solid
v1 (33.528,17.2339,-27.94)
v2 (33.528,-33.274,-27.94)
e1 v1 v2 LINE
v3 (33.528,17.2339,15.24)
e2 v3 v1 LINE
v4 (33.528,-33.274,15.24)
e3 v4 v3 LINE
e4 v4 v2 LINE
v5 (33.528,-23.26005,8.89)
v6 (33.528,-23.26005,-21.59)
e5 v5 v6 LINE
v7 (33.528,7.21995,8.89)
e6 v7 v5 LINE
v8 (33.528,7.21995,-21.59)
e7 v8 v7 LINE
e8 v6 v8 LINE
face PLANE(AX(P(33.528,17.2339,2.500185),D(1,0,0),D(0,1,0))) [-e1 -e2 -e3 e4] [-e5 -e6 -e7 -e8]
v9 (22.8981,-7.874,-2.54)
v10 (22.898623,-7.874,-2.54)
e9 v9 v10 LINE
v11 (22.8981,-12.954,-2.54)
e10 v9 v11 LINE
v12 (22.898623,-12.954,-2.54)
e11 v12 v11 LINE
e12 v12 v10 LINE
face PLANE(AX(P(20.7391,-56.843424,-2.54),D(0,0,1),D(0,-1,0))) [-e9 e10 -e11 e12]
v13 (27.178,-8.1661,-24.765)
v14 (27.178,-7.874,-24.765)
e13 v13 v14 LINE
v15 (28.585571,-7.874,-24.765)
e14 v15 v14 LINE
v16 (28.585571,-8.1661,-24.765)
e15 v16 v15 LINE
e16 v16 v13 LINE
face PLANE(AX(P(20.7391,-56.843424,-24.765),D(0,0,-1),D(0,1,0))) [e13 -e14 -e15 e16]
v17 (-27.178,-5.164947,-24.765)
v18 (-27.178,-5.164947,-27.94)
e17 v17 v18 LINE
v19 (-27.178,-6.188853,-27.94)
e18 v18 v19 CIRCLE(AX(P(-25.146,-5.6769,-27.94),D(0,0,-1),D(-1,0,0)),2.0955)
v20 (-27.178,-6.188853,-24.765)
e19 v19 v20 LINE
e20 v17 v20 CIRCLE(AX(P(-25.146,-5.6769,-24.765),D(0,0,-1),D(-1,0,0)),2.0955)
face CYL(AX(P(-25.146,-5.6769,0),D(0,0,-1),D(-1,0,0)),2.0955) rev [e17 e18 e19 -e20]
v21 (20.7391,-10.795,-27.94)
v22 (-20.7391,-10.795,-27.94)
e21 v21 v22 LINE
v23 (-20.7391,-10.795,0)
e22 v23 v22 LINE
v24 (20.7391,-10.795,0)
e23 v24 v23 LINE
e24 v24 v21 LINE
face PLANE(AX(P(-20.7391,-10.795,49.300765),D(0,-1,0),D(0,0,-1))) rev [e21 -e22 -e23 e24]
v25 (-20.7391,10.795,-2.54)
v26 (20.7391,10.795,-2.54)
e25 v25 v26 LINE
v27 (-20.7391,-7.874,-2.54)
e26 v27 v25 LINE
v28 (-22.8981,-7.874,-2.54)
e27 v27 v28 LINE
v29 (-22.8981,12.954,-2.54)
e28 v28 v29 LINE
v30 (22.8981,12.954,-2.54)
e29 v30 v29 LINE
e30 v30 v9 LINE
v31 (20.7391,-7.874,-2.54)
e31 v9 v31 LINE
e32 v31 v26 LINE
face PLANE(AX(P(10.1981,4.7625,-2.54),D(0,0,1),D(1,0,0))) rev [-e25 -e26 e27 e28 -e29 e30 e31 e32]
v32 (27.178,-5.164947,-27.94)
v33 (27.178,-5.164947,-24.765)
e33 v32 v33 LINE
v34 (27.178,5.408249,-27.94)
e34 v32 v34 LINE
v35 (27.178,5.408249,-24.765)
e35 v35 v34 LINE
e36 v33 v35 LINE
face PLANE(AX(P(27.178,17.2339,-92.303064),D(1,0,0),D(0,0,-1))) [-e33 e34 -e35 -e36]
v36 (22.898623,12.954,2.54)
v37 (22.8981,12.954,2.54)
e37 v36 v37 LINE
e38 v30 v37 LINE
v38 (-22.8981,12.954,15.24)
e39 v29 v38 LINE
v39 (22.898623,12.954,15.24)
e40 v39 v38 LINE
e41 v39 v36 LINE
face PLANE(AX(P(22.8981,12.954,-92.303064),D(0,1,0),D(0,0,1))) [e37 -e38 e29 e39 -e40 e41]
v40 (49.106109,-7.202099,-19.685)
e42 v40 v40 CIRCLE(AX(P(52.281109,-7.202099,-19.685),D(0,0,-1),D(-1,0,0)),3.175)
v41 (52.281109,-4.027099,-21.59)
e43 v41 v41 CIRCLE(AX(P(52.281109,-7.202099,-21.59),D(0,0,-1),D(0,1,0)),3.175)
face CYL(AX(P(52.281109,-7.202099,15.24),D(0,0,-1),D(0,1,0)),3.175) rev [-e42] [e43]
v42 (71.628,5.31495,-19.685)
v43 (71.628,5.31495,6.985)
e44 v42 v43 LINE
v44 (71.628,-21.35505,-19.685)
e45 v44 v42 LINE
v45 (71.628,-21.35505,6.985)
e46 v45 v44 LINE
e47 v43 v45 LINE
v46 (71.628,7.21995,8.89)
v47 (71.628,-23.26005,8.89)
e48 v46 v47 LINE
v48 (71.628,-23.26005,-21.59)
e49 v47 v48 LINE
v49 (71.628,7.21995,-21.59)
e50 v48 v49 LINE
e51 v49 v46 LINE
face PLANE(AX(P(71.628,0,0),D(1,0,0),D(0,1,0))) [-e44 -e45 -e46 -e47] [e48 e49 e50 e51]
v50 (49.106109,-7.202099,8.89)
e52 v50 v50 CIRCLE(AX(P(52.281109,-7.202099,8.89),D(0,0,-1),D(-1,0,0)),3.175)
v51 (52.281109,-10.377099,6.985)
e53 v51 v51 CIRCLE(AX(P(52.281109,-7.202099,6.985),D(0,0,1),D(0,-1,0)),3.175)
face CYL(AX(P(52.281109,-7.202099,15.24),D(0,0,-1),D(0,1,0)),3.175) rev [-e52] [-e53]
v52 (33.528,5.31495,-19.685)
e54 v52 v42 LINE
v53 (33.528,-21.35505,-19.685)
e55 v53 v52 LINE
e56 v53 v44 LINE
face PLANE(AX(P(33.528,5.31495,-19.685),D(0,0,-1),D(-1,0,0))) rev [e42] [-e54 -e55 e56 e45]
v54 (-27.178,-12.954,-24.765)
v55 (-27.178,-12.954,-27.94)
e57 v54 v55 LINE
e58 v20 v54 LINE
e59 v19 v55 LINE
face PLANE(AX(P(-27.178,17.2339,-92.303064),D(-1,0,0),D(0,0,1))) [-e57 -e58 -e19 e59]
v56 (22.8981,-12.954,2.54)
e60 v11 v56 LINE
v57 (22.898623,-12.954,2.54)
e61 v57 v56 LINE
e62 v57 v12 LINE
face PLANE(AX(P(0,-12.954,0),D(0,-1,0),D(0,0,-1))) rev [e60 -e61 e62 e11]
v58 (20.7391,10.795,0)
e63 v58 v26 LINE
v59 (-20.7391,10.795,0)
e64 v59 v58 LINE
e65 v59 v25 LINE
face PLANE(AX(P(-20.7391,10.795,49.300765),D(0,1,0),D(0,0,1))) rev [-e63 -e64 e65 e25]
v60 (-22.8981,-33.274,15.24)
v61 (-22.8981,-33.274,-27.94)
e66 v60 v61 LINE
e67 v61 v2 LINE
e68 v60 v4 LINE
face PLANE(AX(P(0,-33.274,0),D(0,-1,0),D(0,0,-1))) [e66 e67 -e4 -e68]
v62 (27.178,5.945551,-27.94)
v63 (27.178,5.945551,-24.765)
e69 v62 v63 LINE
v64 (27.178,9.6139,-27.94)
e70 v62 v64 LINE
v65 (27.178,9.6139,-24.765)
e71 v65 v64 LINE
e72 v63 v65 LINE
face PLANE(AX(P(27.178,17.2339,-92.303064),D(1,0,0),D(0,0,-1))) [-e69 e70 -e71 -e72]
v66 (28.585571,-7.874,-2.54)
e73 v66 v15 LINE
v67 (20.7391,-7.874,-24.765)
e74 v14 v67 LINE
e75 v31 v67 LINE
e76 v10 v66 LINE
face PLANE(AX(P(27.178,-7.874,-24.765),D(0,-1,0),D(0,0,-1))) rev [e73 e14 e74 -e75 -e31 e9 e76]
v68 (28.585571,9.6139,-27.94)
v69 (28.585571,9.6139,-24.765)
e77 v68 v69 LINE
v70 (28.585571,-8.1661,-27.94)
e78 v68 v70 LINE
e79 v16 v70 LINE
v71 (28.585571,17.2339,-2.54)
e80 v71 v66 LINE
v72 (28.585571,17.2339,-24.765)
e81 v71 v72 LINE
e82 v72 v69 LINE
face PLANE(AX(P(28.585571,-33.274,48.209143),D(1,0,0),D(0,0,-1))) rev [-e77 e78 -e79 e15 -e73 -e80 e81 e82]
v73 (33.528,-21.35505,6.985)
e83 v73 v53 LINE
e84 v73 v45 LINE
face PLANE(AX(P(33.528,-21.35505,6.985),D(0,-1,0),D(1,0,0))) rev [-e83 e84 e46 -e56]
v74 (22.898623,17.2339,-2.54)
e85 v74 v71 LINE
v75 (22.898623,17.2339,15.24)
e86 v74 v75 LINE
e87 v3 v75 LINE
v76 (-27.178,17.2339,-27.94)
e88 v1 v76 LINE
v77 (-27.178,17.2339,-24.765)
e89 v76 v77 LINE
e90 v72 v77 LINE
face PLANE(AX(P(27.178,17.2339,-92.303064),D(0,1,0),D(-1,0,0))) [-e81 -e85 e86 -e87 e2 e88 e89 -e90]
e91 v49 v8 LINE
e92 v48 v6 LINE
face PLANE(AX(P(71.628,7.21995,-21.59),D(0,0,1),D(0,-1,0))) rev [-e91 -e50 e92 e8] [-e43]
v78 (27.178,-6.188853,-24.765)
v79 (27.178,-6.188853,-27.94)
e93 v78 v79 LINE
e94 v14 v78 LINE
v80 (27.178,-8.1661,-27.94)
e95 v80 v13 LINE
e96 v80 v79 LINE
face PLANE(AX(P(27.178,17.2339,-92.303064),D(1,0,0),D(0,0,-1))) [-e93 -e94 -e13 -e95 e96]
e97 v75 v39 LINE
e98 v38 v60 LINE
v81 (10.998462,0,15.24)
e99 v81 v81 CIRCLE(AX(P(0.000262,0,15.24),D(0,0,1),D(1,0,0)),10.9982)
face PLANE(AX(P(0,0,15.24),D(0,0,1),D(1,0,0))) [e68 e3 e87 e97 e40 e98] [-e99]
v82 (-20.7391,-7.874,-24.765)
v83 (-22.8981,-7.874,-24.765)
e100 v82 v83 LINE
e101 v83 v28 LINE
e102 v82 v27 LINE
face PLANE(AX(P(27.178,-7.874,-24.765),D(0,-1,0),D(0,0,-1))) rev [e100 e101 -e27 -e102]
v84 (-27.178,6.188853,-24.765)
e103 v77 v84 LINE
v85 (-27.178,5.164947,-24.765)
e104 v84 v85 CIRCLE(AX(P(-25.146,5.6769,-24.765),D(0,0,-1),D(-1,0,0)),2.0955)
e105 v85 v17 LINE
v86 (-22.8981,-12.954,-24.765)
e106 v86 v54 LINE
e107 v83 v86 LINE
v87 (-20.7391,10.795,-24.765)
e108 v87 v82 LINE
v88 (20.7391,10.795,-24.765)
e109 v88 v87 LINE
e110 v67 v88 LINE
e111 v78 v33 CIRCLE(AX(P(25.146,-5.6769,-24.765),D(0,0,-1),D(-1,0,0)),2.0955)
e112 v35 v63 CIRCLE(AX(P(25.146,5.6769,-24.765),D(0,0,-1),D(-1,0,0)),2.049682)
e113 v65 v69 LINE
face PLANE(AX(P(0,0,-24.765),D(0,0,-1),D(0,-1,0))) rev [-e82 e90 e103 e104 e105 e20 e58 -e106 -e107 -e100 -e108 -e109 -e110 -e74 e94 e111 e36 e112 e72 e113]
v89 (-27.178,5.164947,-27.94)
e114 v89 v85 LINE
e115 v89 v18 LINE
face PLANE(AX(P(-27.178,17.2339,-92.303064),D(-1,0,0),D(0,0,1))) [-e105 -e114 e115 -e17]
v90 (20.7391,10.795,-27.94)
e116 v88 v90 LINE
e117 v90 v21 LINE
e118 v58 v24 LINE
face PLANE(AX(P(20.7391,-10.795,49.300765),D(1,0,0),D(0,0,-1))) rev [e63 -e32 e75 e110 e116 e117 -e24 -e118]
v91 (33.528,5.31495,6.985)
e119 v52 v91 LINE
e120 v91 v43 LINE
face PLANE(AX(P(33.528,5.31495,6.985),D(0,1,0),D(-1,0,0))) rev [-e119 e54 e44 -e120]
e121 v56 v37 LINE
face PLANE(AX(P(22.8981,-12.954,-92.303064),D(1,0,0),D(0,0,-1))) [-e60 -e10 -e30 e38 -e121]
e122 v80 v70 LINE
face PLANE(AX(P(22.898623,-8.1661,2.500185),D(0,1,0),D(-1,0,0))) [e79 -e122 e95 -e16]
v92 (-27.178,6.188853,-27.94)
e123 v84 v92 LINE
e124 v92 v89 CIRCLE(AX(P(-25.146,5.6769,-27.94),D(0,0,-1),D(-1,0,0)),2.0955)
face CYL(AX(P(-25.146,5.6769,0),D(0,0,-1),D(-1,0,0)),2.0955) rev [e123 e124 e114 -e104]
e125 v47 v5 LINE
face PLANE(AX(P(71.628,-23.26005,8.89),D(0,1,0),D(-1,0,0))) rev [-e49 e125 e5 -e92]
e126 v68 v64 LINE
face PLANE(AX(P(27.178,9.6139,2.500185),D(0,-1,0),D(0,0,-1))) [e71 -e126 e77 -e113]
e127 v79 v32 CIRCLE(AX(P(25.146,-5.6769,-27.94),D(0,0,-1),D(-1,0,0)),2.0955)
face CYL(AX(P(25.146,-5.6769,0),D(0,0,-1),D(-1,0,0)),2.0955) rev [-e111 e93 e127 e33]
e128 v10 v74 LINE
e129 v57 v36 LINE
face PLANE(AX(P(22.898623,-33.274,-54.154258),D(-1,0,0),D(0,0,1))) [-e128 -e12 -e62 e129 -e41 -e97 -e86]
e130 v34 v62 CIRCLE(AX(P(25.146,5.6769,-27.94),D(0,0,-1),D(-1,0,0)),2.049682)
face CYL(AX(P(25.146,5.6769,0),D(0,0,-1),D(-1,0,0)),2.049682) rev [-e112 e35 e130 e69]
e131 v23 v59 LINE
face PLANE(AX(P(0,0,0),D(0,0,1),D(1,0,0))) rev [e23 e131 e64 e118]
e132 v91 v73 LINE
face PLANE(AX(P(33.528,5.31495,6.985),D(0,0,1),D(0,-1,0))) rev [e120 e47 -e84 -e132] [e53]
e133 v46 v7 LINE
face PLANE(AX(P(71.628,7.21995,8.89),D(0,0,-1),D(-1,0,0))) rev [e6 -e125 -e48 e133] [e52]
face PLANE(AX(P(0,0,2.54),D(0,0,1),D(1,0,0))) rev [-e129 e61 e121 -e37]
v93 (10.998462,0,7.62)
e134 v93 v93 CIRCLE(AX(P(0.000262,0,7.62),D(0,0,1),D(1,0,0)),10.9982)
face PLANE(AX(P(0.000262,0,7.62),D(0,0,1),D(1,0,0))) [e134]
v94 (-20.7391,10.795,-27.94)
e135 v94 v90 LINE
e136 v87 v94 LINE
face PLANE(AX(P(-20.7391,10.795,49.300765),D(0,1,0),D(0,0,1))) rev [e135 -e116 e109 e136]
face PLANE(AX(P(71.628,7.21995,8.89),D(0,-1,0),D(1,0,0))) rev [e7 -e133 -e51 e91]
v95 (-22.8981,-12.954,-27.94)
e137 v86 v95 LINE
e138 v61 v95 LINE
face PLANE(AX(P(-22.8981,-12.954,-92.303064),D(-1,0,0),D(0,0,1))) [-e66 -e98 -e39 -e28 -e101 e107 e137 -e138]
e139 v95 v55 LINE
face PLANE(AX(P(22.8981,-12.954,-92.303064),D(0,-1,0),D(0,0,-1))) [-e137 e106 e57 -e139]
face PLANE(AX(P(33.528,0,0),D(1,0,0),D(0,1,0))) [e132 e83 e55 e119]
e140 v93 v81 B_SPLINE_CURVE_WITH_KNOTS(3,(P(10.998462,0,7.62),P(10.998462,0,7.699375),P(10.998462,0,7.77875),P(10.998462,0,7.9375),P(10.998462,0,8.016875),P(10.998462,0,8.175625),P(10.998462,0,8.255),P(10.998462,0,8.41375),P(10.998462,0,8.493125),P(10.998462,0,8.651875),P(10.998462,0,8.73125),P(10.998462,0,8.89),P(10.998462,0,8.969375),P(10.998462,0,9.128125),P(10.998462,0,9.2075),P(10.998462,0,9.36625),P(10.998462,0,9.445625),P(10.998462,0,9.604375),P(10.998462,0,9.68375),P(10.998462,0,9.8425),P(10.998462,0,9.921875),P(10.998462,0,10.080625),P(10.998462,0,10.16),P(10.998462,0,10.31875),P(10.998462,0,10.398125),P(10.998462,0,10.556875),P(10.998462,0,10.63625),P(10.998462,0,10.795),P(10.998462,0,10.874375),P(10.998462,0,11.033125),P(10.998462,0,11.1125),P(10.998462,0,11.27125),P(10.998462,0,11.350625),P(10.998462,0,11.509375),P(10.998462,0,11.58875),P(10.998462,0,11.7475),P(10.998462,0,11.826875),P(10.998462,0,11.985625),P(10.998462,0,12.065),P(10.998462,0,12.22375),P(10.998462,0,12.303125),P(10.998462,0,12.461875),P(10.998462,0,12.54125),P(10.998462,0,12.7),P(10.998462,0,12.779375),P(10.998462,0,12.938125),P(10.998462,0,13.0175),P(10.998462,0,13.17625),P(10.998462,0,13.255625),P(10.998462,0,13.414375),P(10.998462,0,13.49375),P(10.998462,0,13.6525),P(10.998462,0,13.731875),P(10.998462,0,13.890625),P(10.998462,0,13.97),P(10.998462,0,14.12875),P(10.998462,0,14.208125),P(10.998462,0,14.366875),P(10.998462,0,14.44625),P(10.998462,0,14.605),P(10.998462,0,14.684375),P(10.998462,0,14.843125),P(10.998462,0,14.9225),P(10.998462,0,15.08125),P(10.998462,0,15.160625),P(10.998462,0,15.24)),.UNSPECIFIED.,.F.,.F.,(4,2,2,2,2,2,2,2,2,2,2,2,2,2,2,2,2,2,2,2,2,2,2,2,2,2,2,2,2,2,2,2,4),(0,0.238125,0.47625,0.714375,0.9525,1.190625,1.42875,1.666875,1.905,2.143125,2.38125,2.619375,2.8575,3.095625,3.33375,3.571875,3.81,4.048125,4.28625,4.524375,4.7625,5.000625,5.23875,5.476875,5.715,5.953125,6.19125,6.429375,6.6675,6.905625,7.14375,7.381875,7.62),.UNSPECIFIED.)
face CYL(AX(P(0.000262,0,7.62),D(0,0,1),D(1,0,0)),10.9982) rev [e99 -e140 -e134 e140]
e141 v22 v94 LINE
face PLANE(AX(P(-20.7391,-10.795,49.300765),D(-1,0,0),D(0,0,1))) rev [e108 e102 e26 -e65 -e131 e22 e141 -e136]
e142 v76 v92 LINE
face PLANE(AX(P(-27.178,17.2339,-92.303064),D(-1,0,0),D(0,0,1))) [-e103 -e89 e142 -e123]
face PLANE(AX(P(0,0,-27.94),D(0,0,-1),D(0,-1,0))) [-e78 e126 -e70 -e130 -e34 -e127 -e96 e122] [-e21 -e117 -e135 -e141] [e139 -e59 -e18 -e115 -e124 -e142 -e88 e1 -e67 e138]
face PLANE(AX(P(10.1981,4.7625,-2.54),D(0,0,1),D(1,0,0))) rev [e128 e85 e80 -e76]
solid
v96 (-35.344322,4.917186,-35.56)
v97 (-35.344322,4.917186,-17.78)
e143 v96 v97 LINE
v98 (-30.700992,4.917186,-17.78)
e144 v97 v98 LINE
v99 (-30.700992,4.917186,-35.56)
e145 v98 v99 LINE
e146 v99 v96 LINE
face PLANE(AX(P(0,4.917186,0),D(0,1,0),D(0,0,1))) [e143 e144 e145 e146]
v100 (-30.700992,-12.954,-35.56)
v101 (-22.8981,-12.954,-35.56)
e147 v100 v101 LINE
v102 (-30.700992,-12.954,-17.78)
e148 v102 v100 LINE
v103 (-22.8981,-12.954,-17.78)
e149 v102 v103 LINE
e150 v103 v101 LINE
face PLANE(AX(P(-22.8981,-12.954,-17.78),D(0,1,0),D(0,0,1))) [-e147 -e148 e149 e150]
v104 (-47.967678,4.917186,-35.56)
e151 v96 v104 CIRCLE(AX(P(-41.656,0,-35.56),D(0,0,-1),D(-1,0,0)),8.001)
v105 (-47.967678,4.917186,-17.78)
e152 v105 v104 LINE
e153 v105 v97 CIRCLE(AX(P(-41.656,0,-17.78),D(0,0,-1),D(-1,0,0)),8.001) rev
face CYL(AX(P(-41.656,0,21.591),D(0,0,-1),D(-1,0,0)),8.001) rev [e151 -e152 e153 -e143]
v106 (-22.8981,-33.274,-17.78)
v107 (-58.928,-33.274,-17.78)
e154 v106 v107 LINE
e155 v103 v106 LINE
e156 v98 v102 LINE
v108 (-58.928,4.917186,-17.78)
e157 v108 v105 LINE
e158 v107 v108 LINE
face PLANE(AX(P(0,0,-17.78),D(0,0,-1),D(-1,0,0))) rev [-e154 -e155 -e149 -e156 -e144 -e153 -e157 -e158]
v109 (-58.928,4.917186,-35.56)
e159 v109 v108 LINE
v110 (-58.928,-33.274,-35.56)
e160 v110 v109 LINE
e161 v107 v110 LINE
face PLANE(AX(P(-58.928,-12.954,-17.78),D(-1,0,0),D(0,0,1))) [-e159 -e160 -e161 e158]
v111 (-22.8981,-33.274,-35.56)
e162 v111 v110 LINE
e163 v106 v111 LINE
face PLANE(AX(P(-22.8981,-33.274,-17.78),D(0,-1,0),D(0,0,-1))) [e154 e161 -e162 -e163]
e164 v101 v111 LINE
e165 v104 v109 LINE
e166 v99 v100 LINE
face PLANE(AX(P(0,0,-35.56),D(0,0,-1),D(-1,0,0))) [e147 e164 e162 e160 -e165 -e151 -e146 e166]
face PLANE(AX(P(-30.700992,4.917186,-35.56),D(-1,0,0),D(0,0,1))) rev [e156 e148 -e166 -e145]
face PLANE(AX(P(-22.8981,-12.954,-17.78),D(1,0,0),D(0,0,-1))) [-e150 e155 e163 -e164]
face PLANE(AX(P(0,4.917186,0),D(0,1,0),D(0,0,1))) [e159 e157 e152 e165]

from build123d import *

# Parameters (mm, degrees)
SKETCH1_W                = 54.356
SKETCH1_H                = 34.4678
SKETCH1_W_2              = 40.2082
SKETCH1_H_2              = 20.32
BOSS_EXTRUDE1_DEPTH      = 27.94
SKETCH2_W                = 54.356
SKETCH2_H                = 34.4678
SKETCH2_W_2              = 45.7962
SKETCH2_H_2              = 25.908
CUT_EXTRUDE1_DEPTH       = 24.765
SKETCH3_R                = 2.04968225
SKETCH3_R_2              = 2.0955
CUT_EXTRUDE2_DEPTH       = 43.618007851
SKETCH4_W                = 19.05
SKETCH4_H                = 9.525
CUT_EXTRUDE3_DEPTH       = 12.7
SKETCH5_W                = 45.7962
SKETCH5_H                = 25.908
BOSS_EXTRUDE2_DEPTH      = 2.54
SKETCH6_W                = 25.4
SKETCH6_H                = 4.2799
BOSS_EXTRUDE3_DEPTH      = 27.305
SKETCH7_W                = 25.4
SKETCH7_H                = 6.35
BOSS_EXTRUDE4_DEPTH      = 19.05
SKETCH10_W               = 3.175
SKETCH10_H               = 19.05
BOSS_EXTRUDE5_DEPTH      = 19.05
CHAMFER1_SIZE            = 19.05
SKETCH12_W               = 7.62
SKETCH12_H               = 31.75
BOSS_EXTRUDE6_DEPTH      = 3.175
SKETCH13_W               = 41.4782
SKETCH13_H               = 21.59
CUT_EXTRUDE7_DEPTH       = 27.94
SKETCH14_W               = 22.225
SKETCH14_H               = 20.828
SKETCH14_W_2             = 49.53
SKETCH14_H_2             = 7.4549
CUT_EXTRUDE8_DEPTH       = 61.866925258
SKETCH15_W               = 3.175
SKETCH15_H               = 4.2799
CUT_EXTRUDE9_DEPTH       = 64.49980823
SKETCH16_W               = 45.796723327
SKETCH16_H               = 30.48
BOSS_EXTRUDE7_DEPTH      = 20.32
BOSS_EXTRUDE8_DEPTH      = 7.62
BOSS_EXTRUDE8_DEPTH_BACK = 10.16
SKETCH17_W               = 36.0299
SKETCH17_H               = 20.32
SKETCH18_W               = 28.227007584
SKETCH18_H               = 17.78
BOSS_EXTRUDE9_DEPTH      = 17.871186
SKETCH19_R               = 8.001
CUT_EXTRUDE10_DEPTH      = 17.78
SKETCH20_W               = 19.05
SKETCH20_H               = 21.1201
CUT_EXTRUDE11_DEPTH      = 70.85190382
SKETCH21_W               = 45.796723327
SKETCH21_H               = 46.228
BOSS_EXTRUDE10_DEPTH     = 12.7
SKETCH23_R               = 10.9982
CUT_EXTRUDE12_DEPTH      = 7.62
SKETCH25_W               = 6.35
SKETCH25_H               = 7.62
SKETCH25_W_2             = 10.629376673
SKETCH25_H_2             = 25.1079
BOSS_EXTRUDE12_DEPTH     = 3.175
SKETCH26_W               = 10.629376673
SKETCH26_H               = 50.5079
BOSS_EXTRUDE14_DEPTH     = 17.78
BOSS_EXTRUDE15_START     = -3.175
SKETCH27_W               = 4.942428742
SKETCH27_H               = 50.5079
BOSS_EXTRUDE15_DEPTH     = 25.4
SKETCH28_W               = 7.846471258
SKETCH28_H               = 22.225
BOSS_EXTRUDE16_DEPTH     = 25.4
SKETCH29_W               = 30.48
SKETCH29_H               = 30.48
BOSS_EXTRUDE17_DEPTH     = 38.1
SKETCH30_W               = 26.67
SKETCH30_H               = 26.67
CUT_EXTRUDE13_DEPTH      = 38.1
SKETCH31_R               = 3.175
CUT_EXTRUDE14_DEPTH      = 88.144583079


with BuildPart() as part:
    # Sketch1 → Boss-Extrude1 (new body)
    with BuildSketch(Plane.XY):
        Rectangle(SKETCH1_W, SKETCH1_H)
        Rectangle(SKETCH1_W_2, SKETCH1_H_2, mode=Mode.SUBTRACT)
    extrude(amount=-BOSS_EXTRUDE1_DEPTH)

    # Sketch2 → Cut-Extrude1 (cut)
    with BuildSketch(Plane.XY):
        Rectangle(SKETCH2_W, SKETCH2_H)
        Rectangle(SKETCH2_W_2, SKETCH2_H_2, mode=Mode.SUBTRACT)
    extrude(amount=-CUT_EXTRUDE1_DEPTH, mode=Mode.SUBTRACT)

    # Sketch3 → Cut-Extrude2 (cut, through all)
    with BuildSketch(Plane(origin=(0, 0, -27.94), x_dir=(-1, 0, 0), z_dir=(0, 0, -1))):
        with Locations((-25.146, 5.6769)):
            Circle(SKETCH3_R)
        with Locations((-25.146, -5.6769)):
            Circle(SKETCH3_R_2)
        with Locations((25.146, -5.6769)):
            Circle(SKETCH3_R_2)
        with Locations((25.146, 5.6769)):
            Circle(SKETCH3_R_2)
    extrude(amount=-CUT_EXTRUDE2_DEPTH, mode=Mode.SUBTRACT)

    # Sketch4 → Cut-Extrude3 (cut)
    with BuildSketch(Plane(origin=(22.8981, 0, 0), x_dir=(0, 0, -1), z_dir=(1, 0, 0))):
        with Locations((12.065, 0)):
            Rectangle(SKETCH4_W, SKETCH4_H)
    extrude(amount=-CUT_EXTRUDE3_DEPTH, mode=Mode.SUBTRACT)

    # Sketch5 → Boss-Extrude2 (add)
    with BuildSketch(Plane.XY):
        Rectangle(SKETCH5_W, SKETCH5_H)
    extrude(amount=BOSS_EXTRUDE2_DEPTH)

    # Sketch6 → Boss-Extrude3 (add)
    with BuildSketch(Plane.XY.offset(2.54)):
        with Locations((0, -15.09395)):
            Rectangle(SKETCH6_W, SKETCH6_H)
    extrude(amount=-BOSS_EXTRUDE3_DEPTH)

    # Sketch7 → Boss-Extrude4 (add)
    with BuildSketch(Plane.XY.offset(2.54)):
        with Locations((0, -14.0589)):
            Rectangle(SKETCH7_W, SKETCH7_H)
    extrude(amount=BOSS_EXTRUDE4_DEPTH)

    # Sketch10 → Boss-Extrude5 (add)
    with BuildSketch(Plane(origin=(0, -10.8839, 0), x_dir=(1, 0, 0), z_dir=(0, 1, 0))):
        with Locations((11.1125, -12.065)):
            Rectangle(SKETCH10_W, SKETCH10_H)
        with Locations((-11.1125, -12.065)):
            Rectangle(SKETCH10_W, SKETCH10_H)
    extrude(amount=BOSS_EXTRUDE5_DEPTH)

    # Chamfer1
    chamfer1_edges = [part.edges().sort_by_distance(p)[0] for p in [
        (-11.1125, 8.1661, 21.59),
        (11.1125, 8.1661, 21.59),
    ]]
    chamfer(chamfer1_edges, length=CHAMFER1_SIZE - 0.0001)  # a hair under: the kernel refuses the full size

    # Sketch12 → Boss-Extrude6 (add)
    with BuildSketch(Plane.XZ.offset(17.2339)):
        with Locations((0, -12.065)):
            Rectangle(SKETCH12_W, SKETCH12_H)
    extrude(amount=BOSS_EXTRUDE6_DEPTH)

    # Sketch13 → Cut-Extrude7 (cut)
    with BuildSketch(Plane(origin=(0, 0, -27.94), x_dir=(-1, 0, 0), z_dir=(0, 0, -1))):
        Rectangle(SKETCH13_W, SKETCH13_H)
    extrude(amount=-CUT_EXTRUDE7_DEPTH, mode=Mode.SUBTRACT)

    # Sketch14 → Cut-Extrude8 (cut, through all)
    with BuildSketch(Plane.ZY.offset(22.8981)):
        with Locations((-13.6525, 2.54)):
            Rectangle(SKETCH14_W, SKETCH14_H)
        with Locations((-3.175, -16.68145)):
            Rectangle(SKETCH14_W_2, SKETCH14_H_2)
    extrude(amount=-CUT_EXTRUDE8_DEPTH, mode=Mode.SUBTRACT)

    # Sketch15 → Cut-Extrude9 (cut, through all)
    with BuildSketch(Plane.ZY.offset(27.178)):
        with Locations((-26.3525, -15.09395)):
            Rectangle(SKETCH15_W, SKETCH15_H)
    extrude(amount=-CUT_EXTRUDE9_DEPTH, mode=Mode.SUBTRACT)

    # Sketch16 → Boss-Extrude7 (add)
    with BuildSketch(Plane.XZ.offset(12.954)):
        with Locations((0.000261663, -12.7)):
            Rectangle(SKETCH16_W, SKETCH16_H)
    extrude(amount=BOSS_EXTRUDE7_DEPTH)

    # Sketch20 → Cut-Extrude11 (cut, through all)
    with BuildSketch(Plane.ZY.offset(22.8981)):
        with Locations((12.065, -2.39395)):
            Rectangle(SKETCH20_W, SKETCH20_H)
    extrude(amount=-CUT_EXTRUDE11_DEPTH, mode=Mode.SUBTRACT)

    # Sketch21 → Boss-Extrude10 (add)
    with BuildSketch(Plane.XY.offset(2.54)):
        with Locations((0.000261663, -10.16)):
            Rectangle(SKETCH21_W, SKETCH21_H)
    extrude(amount=BOSS_EXTRUDE10_DEPTH)

    # Sketch23 → Cut-Extrude12 (cut)
    with BuildSketch(Plane.XY.offset(15.24)):
        with Locations((0.000261663, 0)):
            Circle(SKETCH23_R)
    extrude(amount=-CUT_EXTRUDE12_DEPTH, mode=Mode.SUBTRACT)

    # Sketch25 → Boss-Extrude12 (add)
    with BuildSketch(Plane(origin=(0, 0, -27.94), x_dir=(-1, 0, 0), z_dir=(0, 0, -1))):
        with Locations((-30.353, 13.4239)):
            Rectangle(SKETCH25_W, SKETCH25_H)
        with Locations((-28.213311664, -20.72005)):
            Rectangle(SKETCH25_W_2, SKETCH25_H_2)
    extrude(amount=-BOSS_EXTRUDE12_DEPTH)

    # Sketch26 → Boss-Extrude14 (add)
    with BuildSketch(Plane.XY.offset(15.24)):
        with Locations((28.213311664, -8.02005)):
            Rectangle(SKETCH26_W, SKETCH26_H)
    extrude(amount=-BOSS_EXTRUDE14_DEPTH)

    # Sketch27 → Boss-Extrude15 (add)
    with BuildSketch(Plane.XY.offset(-24.765).offset(BOSS_EXTRUDE15_START)):
        with Locations((31.056785629, -8.02005)):
            Rectangle(SKETCH27_W, SKETCH27_H)
    extrude(amount=BOSS_EXTRUDE15_DEPTH)

    # Sketch28 → Boss-Extrude16 (add)
    with BuildSketch(Plane(origin=(0, -7.874, 0), x_dir=(1, 0, 0), z_dir=(0, 1, 0))):
        with Locations((24.662335629, 13.6525)):
            Rectangle(SKETCH28_W, SKETCH28_H)
    extrude(amount=-BOSS_EXTRUDE16_DEPTH)

    # Sketch29 → Boss-Extrude17 (add)
    with BuildSketch(Plane(origin=(33.528, 0, 0), x_dir=(0, 0, -1), z_dir=(1, 0, 0))):
        with Locations((6.35, -8.02005)):
            Rectangle(SKETCH29_W, SKETCH29_H)
    extrude(amount=BOSS_EXTRUDE17_DEPTH)

    # Sketch30 → Cut-Extrude13 (cut)
    with BuildSketch(Plane(origin=(71.628, 0, 0), x_dir=(0, 0, -1), z_dir=(1, 0, 0))):
        with Locations((6.35, -8.02005)):
            Rectangle(SKETCH30_W, SKETCH30_H)
    extrude(amount=-CUT_EXTRUDE13_DEPTH, mode=Mode.SUBTRACT)

    # Sketch31 → Cut-Extrude14 (cut, through all)
    with BuildSketch(Plane(origin=(0, 0, -21.59), x_dir=(-1, 0, 0), z_dir=(0, 0, -1))):
        with Locations(Location((-52.281109358, -7.202098737, 0), (0, 0, 90))):
            Circle(SKETCH31_R)
    extrude(amount=-CUT_EXTRUDE14_DEPTH, mode=Mode.SUBTRACT)


with BuildPart() as body_2:
    # Sketch17 → Boss-Extrude8 (new, two sides: drawn at the far end of the back side and taken through both)
    with BuildSketch(Plane(origin=(0, 0, -27.94), x_dir=(-1, 0, 0), z_dir=(0, 0, -1)).offset(-BOSS_EXTRUDE8_DEPTH_BACK)):
        with Locations((40.91305, -23.114)):
            Rectangle(SKETCH17_W, SKETCH17_H)
    extrude(amount=BOSS_EXTRUDE8_DEPTH + BOSS_EXTRUDE8_DEPTH_BACK)

    # Sketch18 → Boss-Extrude9 (add)
    with BuildSketch(Plane(origin=(0, -12.954, 0), x_dir=(1, 0, 0), z_dir=(0, 1, 0))):
        with Locations((-44.814496208, 26.67)):
            Rectangle(SKETCH18_W, SKETCH18_H)
    extrude(amount=BOSS_EXTRUDE9_DEPTH)

    # Sketch19 → Cut-Extrude10 (cut)
    with BuildSketch(Plane(origin=(0, 0, -35.56), x_dir=(-1, 0, 0), z_dir=(0, 0, -1))):
        with Locations((41.656, 0)):
            Circle(SKETCH19_R)
    extrude(amount=-CUT_EXTRUDE10_DEPTH, mode=Mode.SUBTRACT)


solid = Compound([part.part, body_2.part])
